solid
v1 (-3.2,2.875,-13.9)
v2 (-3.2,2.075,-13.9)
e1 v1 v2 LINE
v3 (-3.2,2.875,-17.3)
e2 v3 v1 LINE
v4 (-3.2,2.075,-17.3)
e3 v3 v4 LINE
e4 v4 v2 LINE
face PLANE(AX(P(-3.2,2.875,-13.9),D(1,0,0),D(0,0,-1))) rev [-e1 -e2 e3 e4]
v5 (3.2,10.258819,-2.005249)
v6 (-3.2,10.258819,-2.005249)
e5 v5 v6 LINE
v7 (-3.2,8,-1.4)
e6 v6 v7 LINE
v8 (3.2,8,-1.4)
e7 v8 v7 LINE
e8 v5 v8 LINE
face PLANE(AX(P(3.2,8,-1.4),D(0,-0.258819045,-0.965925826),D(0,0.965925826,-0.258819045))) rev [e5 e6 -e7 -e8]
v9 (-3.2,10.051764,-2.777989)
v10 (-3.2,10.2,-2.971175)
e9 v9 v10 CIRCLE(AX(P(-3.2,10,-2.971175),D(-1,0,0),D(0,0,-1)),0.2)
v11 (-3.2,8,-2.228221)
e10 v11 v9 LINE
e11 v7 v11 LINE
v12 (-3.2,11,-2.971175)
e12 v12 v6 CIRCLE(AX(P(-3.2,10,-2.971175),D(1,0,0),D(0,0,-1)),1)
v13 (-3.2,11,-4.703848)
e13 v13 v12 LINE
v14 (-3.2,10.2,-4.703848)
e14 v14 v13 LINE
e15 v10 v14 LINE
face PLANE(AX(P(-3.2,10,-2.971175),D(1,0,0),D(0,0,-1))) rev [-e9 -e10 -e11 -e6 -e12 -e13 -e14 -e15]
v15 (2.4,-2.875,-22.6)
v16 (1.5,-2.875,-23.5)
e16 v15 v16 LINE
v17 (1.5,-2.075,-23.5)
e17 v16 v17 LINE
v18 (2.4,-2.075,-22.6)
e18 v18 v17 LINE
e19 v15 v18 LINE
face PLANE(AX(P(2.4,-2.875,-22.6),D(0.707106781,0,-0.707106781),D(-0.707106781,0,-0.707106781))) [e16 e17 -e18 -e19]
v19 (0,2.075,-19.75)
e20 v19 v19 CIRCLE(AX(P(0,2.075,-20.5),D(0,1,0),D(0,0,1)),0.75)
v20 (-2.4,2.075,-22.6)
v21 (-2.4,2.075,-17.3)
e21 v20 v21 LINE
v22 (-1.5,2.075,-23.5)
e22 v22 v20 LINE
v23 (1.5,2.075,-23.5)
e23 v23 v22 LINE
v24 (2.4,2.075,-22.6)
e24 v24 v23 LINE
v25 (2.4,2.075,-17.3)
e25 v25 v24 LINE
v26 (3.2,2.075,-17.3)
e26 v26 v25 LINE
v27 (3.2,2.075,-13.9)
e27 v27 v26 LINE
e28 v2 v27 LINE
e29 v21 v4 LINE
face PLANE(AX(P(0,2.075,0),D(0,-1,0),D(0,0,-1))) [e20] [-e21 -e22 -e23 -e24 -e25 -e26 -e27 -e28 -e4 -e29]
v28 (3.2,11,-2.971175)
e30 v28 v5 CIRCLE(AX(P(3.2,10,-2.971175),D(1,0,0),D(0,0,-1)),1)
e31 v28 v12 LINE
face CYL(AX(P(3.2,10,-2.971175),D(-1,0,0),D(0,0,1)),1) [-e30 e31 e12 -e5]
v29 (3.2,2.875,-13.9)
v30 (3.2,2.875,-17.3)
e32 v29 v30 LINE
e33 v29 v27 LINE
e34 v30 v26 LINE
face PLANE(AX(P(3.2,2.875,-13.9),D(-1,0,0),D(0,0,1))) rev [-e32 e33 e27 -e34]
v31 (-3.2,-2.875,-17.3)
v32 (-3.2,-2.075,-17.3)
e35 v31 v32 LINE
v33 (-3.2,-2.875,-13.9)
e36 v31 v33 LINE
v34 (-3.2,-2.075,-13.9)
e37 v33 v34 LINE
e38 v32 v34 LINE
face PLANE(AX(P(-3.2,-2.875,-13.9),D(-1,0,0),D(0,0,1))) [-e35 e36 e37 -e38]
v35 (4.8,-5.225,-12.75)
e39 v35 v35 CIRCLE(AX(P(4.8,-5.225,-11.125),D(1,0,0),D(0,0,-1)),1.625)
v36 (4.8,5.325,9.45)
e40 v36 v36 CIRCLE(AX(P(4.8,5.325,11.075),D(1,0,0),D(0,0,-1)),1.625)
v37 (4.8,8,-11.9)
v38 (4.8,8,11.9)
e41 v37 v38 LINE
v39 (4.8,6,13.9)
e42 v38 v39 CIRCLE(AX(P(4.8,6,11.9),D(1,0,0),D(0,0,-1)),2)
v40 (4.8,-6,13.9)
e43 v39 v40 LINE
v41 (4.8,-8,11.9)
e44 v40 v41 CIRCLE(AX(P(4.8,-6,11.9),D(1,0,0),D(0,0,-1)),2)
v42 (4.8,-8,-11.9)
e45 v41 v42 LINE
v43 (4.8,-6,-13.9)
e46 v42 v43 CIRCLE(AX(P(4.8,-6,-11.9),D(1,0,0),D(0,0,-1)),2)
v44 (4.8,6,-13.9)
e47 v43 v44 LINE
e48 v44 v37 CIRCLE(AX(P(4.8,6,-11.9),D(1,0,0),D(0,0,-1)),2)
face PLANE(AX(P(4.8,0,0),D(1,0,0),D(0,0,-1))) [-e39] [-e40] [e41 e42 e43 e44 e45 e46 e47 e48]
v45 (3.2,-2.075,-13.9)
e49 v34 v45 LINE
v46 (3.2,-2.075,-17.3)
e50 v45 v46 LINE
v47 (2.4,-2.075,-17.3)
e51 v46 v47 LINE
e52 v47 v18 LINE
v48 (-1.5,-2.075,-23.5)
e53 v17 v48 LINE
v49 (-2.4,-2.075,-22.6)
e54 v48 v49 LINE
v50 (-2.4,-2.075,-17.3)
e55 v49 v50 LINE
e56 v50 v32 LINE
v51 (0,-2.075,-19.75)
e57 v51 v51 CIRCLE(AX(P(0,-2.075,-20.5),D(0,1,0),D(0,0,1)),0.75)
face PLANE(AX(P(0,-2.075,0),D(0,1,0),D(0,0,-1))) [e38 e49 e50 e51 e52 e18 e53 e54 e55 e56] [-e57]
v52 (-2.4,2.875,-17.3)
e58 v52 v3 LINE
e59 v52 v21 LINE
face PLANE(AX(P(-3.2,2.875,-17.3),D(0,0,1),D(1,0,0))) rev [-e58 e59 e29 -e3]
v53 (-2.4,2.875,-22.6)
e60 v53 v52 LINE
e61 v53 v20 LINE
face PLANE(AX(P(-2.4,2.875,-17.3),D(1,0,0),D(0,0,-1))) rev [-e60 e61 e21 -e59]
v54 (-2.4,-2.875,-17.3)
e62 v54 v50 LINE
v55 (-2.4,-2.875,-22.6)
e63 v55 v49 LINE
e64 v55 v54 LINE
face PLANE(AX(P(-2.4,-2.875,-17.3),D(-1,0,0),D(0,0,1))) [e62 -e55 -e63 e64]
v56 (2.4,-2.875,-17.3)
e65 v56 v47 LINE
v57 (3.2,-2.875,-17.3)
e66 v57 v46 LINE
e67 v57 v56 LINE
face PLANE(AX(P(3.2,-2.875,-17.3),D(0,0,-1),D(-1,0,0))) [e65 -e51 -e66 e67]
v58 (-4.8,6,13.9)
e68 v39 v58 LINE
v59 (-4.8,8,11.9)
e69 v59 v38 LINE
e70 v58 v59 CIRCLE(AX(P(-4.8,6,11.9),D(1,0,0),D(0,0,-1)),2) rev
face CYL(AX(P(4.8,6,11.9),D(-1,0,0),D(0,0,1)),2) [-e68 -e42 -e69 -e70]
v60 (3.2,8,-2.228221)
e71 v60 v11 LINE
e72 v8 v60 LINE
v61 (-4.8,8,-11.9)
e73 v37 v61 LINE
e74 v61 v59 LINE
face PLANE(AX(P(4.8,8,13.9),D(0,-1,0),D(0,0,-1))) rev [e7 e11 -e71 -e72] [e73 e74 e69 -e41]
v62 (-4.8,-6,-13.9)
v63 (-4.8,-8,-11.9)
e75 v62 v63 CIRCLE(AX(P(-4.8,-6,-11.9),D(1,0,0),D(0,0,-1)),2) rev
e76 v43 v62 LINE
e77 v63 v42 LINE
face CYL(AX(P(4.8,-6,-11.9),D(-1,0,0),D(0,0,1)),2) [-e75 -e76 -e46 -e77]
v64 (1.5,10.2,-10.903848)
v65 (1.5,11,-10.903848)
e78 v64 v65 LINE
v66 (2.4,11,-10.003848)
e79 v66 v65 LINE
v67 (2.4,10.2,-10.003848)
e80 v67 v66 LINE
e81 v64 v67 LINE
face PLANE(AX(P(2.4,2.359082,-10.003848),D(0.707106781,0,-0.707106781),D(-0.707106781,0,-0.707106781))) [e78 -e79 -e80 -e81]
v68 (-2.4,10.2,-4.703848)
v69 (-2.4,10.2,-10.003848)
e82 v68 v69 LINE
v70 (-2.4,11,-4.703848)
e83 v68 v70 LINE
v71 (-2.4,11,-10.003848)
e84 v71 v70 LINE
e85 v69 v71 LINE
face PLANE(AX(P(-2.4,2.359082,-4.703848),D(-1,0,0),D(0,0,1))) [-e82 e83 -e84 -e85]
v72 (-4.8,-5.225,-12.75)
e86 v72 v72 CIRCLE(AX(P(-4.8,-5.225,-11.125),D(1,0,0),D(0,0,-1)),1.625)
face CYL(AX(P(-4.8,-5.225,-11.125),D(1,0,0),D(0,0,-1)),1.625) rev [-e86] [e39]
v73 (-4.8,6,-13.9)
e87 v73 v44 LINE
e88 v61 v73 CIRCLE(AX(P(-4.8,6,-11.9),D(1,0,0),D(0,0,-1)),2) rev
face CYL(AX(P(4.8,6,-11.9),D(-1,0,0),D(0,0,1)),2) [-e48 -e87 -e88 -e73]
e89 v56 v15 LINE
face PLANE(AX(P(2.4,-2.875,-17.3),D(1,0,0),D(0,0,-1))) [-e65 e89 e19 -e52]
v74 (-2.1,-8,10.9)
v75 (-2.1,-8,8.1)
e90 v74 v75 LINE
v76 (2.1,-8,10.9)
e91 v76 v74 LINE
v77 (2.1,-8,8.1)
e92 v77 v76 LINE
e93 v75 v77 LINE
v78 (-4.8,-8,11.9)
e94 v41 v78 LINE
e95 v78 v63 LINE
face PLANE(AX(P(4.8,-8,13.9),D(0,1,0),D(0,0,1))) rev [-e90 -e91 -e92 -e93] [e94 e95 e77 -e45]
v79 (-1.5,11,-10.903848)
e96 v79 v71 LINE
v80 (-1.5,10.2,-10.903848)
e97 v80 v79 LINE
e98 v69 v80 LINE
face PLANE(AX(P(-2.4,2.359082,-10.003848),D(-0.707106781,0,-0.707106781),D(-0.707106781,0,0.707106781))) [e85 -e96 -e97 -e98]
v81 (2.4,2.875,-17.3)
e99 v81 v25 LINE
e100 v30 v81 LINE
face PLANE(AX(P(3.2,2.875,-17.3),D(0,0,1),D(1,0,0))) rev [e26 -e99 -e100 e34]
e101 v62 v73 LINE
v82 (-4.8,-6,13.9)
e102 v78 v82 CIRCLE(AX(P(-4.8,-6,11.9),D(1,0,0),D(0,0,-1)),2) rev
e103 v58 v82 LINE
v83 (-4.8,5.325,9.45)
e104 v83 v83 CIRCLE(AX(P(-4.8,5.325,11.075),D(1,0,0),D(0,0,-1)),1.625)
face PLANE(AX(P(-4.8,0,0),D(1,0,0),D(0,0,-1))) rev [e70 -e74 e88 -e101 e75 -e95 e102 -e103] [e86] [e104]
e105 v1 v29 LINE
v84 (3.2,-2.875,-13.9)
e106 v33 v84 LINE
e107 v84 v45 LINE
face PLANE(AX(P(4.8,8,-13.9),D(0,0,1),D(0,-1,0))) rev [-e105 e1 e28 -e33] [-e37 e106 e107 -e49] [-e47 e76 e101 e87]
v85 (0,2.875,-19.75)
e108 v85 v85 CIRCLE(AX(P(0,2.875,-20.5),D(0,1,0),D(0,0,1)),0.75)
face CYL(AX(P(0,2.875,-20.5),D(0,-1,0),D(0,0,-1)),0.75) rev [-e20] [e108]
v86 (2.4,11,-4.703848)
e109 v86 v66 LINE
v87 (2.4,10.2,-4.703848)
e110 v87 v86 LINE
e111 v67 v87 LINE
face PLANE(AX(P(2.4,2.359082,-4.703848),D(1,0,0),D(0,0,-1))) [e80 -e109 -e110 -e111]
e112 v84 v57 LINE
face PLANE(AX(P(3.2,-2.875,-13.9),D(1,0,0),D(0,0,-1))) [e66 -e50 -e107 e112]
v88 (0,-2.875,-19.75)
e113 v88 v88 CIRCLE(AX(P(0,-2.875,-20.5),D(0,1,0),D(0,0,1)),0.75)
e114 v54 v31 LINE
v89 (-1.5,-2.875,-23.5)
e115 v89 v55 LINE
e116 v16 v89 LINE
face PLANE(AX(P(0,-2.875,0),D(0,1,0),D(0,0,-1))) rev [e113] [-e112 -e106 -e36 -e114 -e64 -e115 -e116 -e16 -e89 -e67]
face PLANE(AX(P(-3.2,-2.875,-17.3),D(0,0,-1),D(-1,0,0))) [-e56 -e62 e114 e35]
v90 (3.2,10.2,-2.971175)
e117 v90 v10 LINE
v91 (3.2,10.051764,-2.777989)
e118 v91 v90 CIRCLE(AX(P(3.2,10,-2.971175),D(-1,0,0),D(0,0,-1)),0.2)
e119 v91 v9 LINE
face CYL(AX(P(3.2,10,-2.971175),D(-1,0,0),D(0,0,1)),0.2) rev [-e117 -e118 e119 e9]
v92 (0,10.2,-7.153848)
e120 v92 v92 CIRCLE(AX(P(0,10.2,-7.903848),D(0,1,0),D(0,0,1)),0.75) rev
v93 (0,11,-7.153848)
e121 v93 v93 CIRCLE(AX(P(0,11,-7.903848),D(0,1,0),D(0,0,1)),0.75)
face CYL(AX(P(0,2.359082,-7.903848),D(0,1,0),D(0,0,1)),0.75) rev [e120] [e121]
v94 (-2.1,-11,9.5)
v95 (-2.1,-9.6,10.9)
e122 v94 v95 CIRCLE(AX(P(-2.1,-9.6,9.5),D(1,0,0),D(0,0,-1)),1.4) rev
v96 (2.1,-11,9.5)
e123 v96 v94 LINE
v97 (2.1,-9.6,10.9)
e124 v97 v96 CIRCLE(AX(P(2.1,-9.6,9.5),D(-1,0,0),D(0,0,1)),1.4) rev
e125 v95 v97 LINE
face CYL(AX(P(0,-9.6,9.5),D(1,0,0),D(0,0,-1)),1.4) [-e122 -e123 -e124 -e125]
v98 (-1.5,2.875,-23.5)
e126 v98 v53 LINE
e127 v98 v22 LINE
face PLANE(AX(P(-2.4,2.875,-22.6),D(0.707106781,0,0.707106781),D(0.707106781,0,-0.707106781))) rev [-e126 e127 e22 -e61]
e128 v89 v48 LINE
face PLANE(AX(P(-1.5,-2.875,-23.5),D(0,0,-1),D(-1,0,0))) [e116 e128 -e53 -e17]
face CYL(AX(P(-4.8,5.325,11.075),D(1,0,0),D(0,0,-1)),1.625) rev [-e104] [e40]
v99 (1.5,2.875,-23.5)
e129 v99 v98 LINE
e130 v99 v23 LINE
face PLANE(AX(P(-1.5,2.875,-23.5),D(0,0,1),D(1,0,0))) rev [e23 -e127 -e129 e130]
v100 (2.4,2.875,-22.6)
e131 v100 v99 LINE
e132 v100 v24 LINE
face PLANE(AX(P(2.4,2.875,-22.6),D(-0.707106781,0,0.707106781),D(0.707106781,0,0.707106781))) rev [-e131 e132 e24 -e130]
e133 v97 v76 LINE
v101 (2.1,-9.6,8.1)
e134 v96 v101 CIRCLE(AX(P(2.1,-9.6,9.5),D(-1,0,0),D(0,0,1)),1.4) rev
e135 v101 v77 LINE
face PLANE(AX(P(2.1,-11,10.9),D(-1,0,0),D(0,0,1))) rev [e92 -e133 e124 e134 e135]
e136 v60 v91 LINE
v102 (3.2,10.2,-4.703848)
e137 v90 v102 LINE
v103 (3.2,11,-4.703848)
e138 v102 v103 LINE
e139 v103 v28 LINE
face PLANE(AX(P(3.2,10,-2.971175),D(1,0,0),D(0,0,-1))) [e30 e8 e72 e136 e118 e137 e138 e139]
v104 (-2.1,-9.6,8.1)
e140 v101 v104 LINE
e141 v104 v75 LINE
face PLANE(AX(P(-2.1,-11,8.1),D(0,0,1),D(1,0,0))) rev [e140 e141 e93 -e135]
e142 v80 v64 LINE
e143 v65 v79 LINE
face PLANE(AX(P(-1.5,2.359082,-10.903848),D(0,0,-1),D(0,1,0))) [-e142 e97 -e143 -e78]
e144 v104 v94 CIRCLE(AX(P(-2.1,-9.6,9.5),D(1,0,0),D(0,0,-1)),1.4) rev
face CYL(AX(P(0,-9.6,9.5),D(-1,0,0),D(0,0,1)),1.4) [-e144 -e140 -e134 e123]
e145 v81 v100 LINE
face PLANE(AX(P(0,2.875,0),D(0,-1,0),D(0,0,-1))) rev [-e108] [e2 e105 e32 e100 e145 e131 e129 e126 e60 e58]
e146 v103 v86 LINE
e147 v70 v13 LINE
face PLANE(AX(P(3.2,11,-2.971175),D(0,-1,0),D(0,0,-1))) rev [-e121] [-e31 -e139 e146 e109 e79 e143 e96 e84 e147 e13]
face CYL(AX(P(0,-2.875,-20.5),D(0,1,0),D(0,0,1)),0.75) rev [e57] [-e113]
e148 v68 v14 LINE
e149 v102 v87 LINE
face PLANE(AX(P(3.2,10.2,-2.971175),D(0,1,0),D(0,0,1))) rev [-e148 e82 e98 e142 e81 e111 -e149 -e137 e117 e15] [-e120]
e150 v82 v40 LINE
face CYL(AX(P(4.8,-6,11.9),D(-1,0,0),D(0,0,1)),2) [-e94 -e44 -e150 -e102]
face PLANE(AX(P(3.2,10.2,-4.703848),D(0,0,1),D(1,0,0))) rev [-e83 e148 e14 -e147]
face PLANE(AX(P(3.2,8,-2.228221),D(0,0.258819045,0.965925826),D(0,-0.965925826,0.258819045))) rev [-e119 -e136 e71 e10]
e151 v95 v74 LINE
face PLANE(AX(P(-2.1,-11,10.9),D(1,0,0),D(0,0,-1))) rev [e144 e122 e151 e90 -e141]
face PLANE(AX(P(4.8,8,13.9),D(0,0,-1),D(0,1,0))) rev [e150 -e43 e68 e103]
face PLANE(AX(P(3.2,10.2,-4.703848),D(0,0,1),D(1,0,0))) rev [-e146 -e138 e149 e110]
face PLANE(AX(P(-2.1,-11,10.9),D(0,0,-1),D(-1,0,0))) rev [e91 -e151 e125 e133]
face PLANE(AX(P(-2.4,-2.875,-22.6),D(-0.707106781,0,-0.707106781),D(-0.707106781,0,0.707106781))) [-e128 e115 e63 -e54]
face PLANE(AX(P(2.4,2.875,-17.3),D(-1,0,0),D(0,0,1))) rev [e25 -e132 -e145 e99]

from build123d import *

# Parameters (mm, degrees)
CROQUIS1_W              = 27.8
CROQUIS1_H              = 16
SALIENTE_EXTRUIR1_DEPTH = 4.8
REDONDEO1_R             = 2
SALIENTE_EXTRUIR2_START = 2.075
CROQUIS2_R              = 0.75
SALIENTE_EXTRUIR2_DEPTH = 0.8
SALIENTE_EXTRUIR3_DEPTH = 3.2
CROQUIS4_R              = 0.75
SALIENTE_EXTRUIR4_DEPTH = 0.8
CROQUIS5_R              = 1.625
CORTAR_EXTRUIR1_DEPTH   = 28.66604417
CROQUIS6_W              = 4.2
CROQUIS6_H              = 2.8
SALIENTE_EXTRUIR5_DEPTH = 3
REDONDEO2_R             = 1.4


with BuildPart() as part:
    # Croquis1 → Saliente-Extruir1 (new, symmetric)
    with BuildSketch(Plane(origin=(0, 0, 0), x_dir=(0, 0, -1), z_dir=(1, 0, 0))):
        Rectangle(CROQUIS1_W, CROQUIS1_H)
    extrude(amount=SALIENTE_EXTRUIR1_DEPTH, both=True)

    # Redondeo1
    redondeo1_edges = [part.edges().sort_by_distance(p)[0] for p in [
        (0, -8, -13.9),
        (0, -8, 13.9),
        (0, 8, 13.9),
        (0, 8, -13.9),
    ]]
    fillet(redondeo1_edges, radius=REDONDEO1_R)

    # Croquis2 → Saliente-Extruir2 (add)
    with BuildSketch(Plane(origin=(0, 0, 0), x_dir=(1, 0, 0), z_dir=(0, 1, 0)).offset(SALIENTE_EXTRUIR2_START)):
        Polygon((3.2, 13.9), (-3.2, 13.9), (-3.2, 17.3), (-2.4, 17.3), (-2.4, 22.6), (-1.5, 23.5), (1.5, 23.5), (2.4, 22.6), (2.4, 17.3), (3.2, 17.3), align=None)
        with Locations(Location((0, 20.5, 0), (0, 0, 270))):
            Circle(CROQUIS2_R, mode=Mode.SUBTRACT)
    saliente_extruir2 = extrude(amount=SALIENTE_EXTRUIR2_DEPTH)

    # Simetría1: Saliente-Extruir2 across plane
    add(saliente_extruir2.mirror(Plane.ZX))

    # Croquis3 → Saliente-Extruir3 (add, symmetric)
    with BuildSketch(Plane(origin=(0, 0, 0), x_dir=(0, 0, -1), z_dir=(1, 0, 0))):
        with BuildLine():
            Line((1.4, 8), (2.005248739, 10.258819045))
            ThreePointArc((2.005248739, 10.258819045), (2.362413136, 10.79335334), (2.971174565, 11))
            Line((2.971174565, 11), (4.703847577, 11))
            Line((4.703847577, 11), (4.703847577, 10.2))
            Line((4.703847577, 10.2), (2.971174565, 10.2))
            ThreePointArc((2.971174565, 10.2), (2.849422279, 10.158670668), (2.7779894, 10.051763809))
            Line((2.7779894, 10.051763809), (2.228220944, 8))
            Line((2.228220944, 8), (1.4, 8))
        make_face()
    extrude(amount=SALIENTE_EXTRUIR3_DEPTH, both=True)

    # Croquis4 → Saliente-Extruir4 (add)
    with BuildSketch(Plane(origin=(0, 11, 0), x_dir=(1, 0, 0), z_dir=(0, 1, 0))):
        Polygon((-2.4, 4.703847577), (-2.4, 10.003847577), (-1.5, 10.903847577), (1.5, 10.903847577), (2.4, 10.003847577), (2.4, 4.703847577), align=None)
        with Locations(Location((0, 7.903847577, 0), (0, 0, 270))):
            Circle(CROQUIS4_R, mode=Mode.SUBTRACT)
    extrude(amount=-SALIENTE_EXTRUIR4_DEPTH)

    # Croquis5 → Cortar-Extruir1 (cut, through all)
    with BuildSketch(Plane(origin=(4.8, 0, 0), x_dir=(0, 0, -1), z_dir=(1, 0, 0))):
        with Locations((-11.075, 5.325)):
            Circle(CROQUIS5_R)
        with Locations((11.125, -5.225)):
            Circle(CROQUIS5_R)
    extrude(amount=-CORTAR_EXTRUIR1_DEPTH, mode=Mode.SUBTRACT)

    # Croquis6 → Saliente-Extruir5 (add)
    with BuildSketch(Plane.XZ.offset(8)):
        with Locations((0, 9.5)):
            Rectangle(CROQUIS6_W, CROQUIS6_H)
    extrude(amount=SALIENTE_EXTRUIR5_DEPTH)

    # Redondeo2
    redondeo2_edges = [part.edges().sort_by_distance(p)[0] for p in [
        (0, -11, 8.1),
        (0, -11, 10.9),
    ]]
    fillet(redondeo2_edges, radius=REDONDEO2_R - 0.0001)  # a hair under: the kernel refuses the full size


solid = part.part
